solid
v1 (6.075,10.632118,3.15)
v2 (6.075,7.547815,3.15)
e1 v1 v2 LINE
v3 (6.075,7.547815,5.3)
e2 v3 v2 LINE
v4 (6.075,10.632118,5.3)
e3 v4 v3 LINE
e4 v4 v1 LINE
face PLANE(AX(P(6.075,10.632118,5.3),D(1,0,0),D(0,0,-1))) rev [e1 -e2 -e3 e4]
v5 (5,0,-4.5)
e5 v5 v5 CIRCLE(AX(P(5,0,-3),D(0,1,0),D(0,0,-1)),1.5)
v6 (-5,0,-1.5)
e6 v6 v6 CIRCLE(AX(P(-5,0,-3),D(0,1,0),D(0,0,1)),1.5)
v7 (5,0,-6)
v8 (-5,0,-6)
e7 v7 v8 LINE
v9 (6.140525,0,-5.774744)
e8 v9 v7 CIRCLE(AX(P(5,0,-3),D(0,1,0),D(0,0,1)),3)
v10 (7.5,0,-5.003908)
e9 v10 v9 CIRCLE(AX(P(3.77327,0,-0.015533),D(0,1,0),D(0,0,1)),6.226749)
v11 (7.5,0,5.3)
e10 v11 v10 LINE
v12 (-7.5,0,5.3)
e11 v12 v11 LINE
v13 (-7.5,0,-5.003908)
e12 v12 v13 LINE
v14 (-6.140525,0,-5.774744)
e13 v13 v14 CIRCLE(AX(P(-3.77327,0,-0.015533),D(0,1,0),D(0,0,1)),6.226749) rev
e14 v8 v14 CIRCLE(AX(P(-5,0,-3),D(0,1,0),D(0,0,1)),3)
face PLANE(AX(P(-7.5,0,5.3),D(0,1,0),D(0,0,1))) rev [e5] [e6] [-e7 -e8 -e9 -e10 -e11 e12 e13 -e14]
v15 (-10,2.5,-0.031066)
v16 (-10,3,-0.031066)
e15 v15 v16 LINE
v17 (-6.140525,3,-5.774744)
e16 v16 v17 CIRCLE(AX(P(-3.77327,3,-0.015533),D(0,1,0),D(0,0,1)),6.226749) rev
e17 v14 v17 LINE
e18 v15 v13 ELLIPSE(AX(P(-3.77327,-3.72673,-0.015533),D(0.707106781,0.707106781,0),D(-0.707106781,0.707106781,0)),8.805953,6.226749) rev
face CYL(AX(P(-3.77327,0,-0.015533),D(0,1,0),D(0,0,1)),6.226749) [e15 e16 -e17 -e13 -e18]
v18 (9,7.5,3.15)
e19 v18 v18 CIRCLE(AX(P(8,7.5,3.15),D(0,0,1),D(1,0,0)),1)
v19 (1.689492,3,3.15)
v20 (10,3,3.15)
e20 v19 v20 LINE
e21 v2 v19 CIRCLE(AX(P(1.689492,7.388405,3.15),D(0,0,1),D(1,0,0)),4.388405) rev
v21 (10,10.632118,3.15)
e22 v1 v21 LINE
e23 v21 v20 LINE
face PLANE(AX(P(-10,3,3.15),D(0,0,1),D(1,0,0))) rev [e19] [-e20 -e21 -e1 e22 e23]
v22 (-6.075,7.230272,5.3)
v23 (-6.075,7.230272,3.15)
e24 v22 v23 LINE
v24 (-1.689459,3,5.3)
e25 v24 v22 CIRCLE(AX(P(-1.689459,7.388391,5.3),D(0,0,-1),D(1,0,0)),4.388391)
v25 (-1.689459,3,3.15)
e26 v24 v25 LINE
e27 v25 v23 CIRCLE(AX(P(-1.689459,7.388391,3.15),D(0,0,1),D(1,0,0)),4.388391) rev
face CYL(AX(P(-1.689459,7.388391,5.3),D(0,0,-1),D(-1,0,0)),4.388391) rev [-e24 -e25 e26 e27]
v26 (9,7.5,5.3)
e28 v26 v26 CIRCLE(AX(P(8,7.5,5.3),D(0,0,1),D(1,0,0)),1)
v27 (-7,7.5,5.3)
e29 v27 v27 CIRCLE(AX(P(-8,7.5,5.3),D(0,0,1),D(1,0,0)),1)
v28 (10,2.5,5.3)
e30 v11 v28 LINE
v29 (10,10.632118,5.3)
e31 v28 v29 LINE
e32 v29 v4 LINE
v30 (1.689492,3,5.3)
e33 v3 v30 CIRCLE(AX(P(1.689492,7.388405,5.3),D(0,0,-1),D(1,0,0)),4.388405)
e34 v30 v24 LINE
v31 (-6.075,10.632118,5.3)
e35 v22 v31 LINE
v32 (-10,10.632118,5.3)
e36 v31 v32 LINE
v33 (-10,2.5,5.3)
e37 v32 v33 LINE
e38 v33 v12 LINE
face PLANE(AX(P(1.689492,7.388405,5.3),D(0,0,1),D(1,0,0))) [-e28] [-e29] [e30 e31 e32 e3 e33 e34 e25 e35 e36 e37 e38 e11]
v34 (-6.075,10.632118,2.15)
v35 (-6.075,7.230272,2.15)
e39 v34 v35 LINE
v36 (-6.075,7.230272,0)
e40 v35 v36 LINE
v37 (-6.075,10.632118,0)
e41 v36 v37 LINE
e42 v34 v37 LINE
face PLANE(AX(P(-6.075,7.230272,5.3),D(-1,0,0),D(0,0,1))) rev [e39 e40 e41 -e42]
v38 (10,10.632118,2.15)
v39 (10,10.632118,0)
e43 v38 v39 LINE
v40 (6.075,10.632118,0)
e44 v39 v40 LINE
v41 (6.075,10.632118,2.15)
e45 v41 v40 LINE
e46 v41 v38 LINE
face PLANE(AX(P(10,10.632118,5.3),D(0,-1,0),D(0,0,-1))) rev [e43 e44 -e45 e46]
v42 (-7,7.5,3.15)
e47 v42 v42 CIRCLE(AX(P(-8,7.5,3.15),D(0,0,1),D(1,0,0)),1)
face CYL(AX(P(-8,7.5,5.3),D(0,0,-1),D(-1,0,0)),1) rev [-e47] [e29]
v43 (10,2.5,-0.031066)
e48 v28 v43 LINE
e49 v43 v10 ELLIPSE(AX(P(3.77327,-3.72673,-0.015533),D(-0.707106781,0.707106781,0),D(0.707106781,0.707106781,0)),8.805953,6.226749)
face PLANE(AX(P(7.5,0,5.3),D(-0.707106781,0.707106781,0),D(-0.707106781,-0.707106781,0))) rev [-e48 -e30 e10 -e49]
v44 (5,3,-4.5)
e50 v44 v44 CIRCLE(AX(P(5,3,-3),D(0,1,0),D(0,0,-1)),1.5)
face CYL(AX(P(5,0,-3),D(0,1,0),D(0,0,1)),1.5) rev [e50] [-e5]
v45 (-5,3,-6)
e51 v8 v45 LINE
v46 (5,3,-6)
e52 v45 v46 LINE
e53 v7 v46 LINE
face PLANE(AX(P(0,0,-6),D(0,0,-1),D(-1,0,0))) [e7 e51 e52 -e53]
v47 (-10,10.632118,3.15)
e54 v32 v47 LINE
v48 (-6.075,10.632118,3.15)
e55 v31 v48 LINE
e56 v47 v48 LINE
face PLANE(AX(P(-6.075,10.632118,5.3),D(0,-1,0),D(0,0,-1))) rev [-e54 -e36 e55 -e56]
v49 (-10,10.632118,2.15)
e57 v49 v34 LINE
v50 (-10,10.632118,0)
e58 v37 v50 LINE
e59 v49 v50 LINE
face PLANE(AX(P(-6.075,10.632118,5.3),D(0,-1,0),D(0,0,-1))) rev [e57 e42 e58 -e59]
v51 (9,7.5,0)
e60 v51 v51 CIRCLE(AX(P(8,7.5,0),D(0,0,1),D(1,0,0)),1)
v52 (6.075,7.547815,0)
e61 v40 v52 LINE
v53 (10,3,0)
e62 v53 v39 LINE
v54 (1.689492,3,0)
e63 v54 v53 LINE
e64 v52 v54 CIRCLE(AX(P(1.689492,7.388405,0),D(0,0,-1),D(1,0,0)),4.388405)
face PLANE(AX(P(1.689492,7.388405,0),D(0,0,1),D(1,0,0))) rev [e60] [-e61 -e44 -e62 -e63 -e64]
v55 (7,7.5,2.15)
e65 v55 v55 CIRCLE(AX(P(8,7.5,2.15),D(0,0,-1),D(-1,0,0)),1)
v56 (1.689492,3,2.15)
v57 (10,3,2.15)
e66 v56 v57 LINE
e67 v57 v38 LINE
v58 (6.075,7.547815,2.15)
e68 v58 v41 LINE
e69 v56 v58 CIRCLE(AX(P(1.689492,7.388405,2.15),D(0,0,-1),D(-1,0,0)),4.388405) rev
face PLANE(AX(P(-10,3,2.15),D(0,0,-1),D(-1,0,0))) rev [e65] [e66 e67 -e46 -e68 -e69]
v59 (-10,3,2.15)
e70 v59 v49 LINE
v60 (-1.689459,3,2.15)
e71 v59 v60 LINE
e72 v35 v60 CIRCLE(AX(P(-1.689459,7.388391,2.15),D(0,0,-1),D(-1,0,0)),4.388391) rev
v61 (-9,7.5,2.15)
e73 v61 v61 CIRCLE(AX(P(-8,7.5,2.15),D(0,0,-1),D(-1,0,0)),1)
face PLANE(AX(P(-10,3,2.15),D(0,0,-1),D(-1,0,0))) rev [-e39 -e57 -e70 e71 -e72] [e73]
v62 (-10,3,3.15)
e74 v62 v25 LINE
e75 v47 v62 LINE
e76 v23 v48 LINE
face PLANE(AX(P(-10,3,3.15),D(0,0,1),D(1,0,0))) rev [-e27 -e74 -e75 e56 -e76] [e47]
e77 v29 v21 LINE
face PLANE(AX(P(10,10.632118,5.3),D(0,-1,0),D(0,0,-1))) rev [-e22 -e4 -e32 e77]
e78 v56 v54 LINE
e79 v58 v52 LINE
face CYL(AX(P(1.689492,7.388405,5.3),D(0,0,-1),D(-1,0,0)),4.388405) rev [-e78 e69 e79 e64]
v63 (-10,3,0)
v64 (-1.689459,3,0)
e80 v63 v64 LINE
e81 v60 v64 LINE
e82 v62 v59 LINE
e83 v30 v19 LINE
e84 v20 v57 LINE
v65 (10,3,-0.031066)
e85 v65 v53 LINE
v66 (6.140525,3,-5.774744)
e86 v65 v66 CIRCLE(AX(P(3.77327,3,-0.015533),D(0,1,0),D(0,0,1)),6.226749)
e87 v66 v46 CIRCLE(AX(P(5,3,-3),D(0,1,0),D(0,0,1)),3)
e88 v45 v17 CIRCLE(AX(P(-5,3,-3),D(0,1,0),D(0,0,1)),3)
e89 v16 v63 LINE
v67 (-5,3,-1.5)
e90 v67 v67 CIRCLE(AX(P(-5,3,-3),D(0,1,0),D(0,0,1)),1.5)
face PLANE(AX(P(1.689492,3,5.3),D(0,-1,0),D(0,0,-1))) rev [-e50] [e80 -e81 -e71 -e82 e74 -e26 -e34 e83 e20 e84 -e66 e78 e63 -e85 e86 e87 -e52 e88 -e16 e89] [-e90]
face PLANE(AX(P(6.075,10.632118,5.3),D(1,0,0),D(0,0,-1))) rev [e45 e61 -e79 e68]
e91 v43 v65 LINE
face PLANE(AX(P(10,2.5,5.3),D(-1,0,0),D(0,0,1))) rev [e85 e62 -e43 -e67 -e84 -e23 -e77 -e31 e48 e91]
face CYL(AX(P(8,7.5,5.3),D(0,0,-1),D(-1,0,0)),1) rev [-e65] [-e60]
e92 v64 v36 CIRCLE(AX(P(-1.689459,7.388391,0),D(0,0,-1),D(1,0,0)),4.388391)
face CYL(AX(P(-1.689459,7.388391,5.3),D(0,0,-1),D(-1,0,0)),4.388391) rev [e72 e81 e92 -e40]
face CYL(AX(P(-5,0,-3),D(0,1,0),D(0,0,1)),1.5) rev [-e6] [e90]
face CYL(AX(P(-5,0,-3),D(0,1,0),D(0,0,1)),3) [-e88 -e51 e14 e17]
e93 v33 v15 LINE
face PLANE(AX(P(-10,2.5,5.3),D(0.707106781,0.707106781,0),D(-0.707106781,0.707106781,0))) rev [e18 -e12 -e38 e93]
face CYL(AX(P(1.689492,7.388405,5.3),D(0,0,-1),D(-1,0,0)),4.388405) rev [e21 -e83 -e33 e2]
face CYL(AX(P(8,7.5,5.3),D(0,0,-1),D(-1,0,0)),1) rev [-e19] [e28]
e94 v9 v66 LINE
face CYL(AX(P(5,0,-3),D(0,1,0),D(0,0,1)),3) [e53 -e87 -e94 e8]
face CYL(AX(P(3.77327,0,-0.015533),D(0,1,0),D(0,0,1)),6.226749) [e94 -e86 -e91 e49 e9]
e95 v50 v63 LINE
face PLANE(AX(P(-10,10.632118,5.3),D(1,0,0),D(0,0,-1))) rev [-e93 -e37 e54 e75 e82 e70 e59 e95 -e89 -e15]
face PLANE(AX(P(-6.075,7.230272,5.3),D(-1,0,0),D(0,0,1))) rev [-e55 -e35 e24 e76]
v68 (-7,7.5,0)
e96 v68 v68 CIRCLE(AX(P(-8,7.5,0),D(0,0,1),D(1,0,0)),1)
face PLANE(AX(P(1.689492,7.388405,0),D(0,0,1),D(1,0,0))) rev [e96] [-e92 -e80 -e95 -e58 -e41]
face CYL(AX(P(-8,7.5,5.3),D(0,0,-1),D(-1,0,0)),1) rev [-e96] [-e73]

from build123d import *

# Parameters (mm, degrees)
SKETCH1_R           = 1
BOSS_EXTRUDE1_DEPTH = 5.3
SKETCH2_W           = 1
SKETCH2_H           = 7.632118098
CUT_EXTRUDE1_DEPTH  = 24.262242696
BOSS_EXTRUDE2_DEPTH = 6
SKETCH5_R           = 1.5
CUT_EXTRUDE2_DEPTH  = 14.937332122
CUT_EXTRUDE3_START  = -3
CUT_EXTRUDE3_DEPTH  = 3


# Read off the part's stored shape, not the designer's step: Cut-Extrude3
with BuildPart() as part:
    # Sketch1 → Boss-Extrude1 (new body)
    with BuildSketch(Plane.XY):
        with BuildLine():
            Line((-7.5, 0), (7.5, 0))
            Line((7.5, 0), (10, 2.5))
            Line((10, 2.5), (10, 10.632118098))
            Line((10, 10.632118098), (6.075, 10.632118098))
            Line((6.075, 10.632118098), (6.075, 7.547815402))
            ThreePointArc((6.075, 7.547815402), (4.848419821, 4.342215517), (1.689491671, 3))
            Line((1.689491671, 3), (-1.689458819, 3))
            ThreePointArc((-1.689458819, 3), (-4.736103523, 4.229921298), (-6.075, 7.230272374))
            Line((-6.075, 7.230272374), (-6.075, 10.632118098))
            Line((-6.075, 10.632118098), (-10, 10.632118098))
            Line((-10, 10.632118098), (-10, 2.5))
            Line((-10, 2.5), (-7.5, 0))
        make_face()
        with Locations((-8, 7.5)):
            Circle(SKETCH1_R, mode=Mode.SUBTRACT)
        with Locations((8, 7.5)):
            Circle(SKETCH1_R, mode=Mode.SUBTRACT)
    extrude(amount=BOSS_EXTRUDE1_DEPTH)

    # Sketch2 → Cut-Extrude1 (cut, through all)
    with BuildSketch(Plane(origin=(10, 0, 0), x_dir=(0, 0, -1), z_dir=(1, 0, 0))):
        with Locations((-2.65, 6.816059049)):
            Rectangle(SKETCH2_W, SKETCH2_H)
    extrude(amount=-CUT_EXTRUDE1_DEPTH, mode=Mode.SUBTRACT)

    # Sketch3 → Boss-Extrude2 (add)
    with BuildSketch(Plane(origin=(0, 0, 0), x_dir=(-1, 0, 0), z_dir=(0, 0, -1))):
        Polygon((10, 2.5), (10, 3), (1.689458819, 3), (-1.689491671, 3), (-10, 3), (-10, 2.5), (-7.5, 0), (7.5, 0), align=None)
    extrude(amount=BOSS_EXTRUDE2_DEPTH)

    # Sketch5 → Cut-Extrude2 (cut, through all)
    with BuildSketch(Plane(origin=(0, 3, 0), x_dir=(1, 0, 0), z_dir=(0, 1, 0))):
        with Locations(Location((-5, 3, 0), (0, 0, 270))):
            Circle(SKETCH5_R)
        with Locations(Location((5, 3, 0), (0, 0, 90))):
            Circle(SKETCH5_R)
    extrude(amount=-CUT_EXTRUDE2_DEPTH, mode=Mode.SUBTRACT)

    # Cut-Extrude3 outline → Cut-Extrude3 (cut)
    with BuildSketch(Plane(origin=(0, 3, 0), x_dir=(1, 0, 0), z_dir=(0, 1, 0)).offset(CUT_EXTRUDE3_START)):
        with BuildLine():
            ThreePointArc((-6.14052533, 5.774743587), (-5.581278436, 5.94314719), (-5, 6))
            Line((-5, 6), (-10, 6))
            Line((-10, 6), (-10, 0.031065848))
            ThreePointArc((-10, 0.031065848), (-8.941597101, 3.488399471), (-6.14052533, 5.774743587))
        make_face()
        with BuildLine():
            ThreePointArc((6.14052533, 5.774743587), (8.941597101, 3.488399471), (10, 0.031065848))
            Line((10, 0.031065848), (10, 6))
            Line((10, 6), (5, 6))
            ThreePointArc((5, 6), (5.581278436, 5.94314719), (6.14052533, 5.774743587))
        make_face()
    extrude(amount=CUT_EXTRUDE3_DEPTH, mode=Mode.SUBTRACT)


solid = part.part
